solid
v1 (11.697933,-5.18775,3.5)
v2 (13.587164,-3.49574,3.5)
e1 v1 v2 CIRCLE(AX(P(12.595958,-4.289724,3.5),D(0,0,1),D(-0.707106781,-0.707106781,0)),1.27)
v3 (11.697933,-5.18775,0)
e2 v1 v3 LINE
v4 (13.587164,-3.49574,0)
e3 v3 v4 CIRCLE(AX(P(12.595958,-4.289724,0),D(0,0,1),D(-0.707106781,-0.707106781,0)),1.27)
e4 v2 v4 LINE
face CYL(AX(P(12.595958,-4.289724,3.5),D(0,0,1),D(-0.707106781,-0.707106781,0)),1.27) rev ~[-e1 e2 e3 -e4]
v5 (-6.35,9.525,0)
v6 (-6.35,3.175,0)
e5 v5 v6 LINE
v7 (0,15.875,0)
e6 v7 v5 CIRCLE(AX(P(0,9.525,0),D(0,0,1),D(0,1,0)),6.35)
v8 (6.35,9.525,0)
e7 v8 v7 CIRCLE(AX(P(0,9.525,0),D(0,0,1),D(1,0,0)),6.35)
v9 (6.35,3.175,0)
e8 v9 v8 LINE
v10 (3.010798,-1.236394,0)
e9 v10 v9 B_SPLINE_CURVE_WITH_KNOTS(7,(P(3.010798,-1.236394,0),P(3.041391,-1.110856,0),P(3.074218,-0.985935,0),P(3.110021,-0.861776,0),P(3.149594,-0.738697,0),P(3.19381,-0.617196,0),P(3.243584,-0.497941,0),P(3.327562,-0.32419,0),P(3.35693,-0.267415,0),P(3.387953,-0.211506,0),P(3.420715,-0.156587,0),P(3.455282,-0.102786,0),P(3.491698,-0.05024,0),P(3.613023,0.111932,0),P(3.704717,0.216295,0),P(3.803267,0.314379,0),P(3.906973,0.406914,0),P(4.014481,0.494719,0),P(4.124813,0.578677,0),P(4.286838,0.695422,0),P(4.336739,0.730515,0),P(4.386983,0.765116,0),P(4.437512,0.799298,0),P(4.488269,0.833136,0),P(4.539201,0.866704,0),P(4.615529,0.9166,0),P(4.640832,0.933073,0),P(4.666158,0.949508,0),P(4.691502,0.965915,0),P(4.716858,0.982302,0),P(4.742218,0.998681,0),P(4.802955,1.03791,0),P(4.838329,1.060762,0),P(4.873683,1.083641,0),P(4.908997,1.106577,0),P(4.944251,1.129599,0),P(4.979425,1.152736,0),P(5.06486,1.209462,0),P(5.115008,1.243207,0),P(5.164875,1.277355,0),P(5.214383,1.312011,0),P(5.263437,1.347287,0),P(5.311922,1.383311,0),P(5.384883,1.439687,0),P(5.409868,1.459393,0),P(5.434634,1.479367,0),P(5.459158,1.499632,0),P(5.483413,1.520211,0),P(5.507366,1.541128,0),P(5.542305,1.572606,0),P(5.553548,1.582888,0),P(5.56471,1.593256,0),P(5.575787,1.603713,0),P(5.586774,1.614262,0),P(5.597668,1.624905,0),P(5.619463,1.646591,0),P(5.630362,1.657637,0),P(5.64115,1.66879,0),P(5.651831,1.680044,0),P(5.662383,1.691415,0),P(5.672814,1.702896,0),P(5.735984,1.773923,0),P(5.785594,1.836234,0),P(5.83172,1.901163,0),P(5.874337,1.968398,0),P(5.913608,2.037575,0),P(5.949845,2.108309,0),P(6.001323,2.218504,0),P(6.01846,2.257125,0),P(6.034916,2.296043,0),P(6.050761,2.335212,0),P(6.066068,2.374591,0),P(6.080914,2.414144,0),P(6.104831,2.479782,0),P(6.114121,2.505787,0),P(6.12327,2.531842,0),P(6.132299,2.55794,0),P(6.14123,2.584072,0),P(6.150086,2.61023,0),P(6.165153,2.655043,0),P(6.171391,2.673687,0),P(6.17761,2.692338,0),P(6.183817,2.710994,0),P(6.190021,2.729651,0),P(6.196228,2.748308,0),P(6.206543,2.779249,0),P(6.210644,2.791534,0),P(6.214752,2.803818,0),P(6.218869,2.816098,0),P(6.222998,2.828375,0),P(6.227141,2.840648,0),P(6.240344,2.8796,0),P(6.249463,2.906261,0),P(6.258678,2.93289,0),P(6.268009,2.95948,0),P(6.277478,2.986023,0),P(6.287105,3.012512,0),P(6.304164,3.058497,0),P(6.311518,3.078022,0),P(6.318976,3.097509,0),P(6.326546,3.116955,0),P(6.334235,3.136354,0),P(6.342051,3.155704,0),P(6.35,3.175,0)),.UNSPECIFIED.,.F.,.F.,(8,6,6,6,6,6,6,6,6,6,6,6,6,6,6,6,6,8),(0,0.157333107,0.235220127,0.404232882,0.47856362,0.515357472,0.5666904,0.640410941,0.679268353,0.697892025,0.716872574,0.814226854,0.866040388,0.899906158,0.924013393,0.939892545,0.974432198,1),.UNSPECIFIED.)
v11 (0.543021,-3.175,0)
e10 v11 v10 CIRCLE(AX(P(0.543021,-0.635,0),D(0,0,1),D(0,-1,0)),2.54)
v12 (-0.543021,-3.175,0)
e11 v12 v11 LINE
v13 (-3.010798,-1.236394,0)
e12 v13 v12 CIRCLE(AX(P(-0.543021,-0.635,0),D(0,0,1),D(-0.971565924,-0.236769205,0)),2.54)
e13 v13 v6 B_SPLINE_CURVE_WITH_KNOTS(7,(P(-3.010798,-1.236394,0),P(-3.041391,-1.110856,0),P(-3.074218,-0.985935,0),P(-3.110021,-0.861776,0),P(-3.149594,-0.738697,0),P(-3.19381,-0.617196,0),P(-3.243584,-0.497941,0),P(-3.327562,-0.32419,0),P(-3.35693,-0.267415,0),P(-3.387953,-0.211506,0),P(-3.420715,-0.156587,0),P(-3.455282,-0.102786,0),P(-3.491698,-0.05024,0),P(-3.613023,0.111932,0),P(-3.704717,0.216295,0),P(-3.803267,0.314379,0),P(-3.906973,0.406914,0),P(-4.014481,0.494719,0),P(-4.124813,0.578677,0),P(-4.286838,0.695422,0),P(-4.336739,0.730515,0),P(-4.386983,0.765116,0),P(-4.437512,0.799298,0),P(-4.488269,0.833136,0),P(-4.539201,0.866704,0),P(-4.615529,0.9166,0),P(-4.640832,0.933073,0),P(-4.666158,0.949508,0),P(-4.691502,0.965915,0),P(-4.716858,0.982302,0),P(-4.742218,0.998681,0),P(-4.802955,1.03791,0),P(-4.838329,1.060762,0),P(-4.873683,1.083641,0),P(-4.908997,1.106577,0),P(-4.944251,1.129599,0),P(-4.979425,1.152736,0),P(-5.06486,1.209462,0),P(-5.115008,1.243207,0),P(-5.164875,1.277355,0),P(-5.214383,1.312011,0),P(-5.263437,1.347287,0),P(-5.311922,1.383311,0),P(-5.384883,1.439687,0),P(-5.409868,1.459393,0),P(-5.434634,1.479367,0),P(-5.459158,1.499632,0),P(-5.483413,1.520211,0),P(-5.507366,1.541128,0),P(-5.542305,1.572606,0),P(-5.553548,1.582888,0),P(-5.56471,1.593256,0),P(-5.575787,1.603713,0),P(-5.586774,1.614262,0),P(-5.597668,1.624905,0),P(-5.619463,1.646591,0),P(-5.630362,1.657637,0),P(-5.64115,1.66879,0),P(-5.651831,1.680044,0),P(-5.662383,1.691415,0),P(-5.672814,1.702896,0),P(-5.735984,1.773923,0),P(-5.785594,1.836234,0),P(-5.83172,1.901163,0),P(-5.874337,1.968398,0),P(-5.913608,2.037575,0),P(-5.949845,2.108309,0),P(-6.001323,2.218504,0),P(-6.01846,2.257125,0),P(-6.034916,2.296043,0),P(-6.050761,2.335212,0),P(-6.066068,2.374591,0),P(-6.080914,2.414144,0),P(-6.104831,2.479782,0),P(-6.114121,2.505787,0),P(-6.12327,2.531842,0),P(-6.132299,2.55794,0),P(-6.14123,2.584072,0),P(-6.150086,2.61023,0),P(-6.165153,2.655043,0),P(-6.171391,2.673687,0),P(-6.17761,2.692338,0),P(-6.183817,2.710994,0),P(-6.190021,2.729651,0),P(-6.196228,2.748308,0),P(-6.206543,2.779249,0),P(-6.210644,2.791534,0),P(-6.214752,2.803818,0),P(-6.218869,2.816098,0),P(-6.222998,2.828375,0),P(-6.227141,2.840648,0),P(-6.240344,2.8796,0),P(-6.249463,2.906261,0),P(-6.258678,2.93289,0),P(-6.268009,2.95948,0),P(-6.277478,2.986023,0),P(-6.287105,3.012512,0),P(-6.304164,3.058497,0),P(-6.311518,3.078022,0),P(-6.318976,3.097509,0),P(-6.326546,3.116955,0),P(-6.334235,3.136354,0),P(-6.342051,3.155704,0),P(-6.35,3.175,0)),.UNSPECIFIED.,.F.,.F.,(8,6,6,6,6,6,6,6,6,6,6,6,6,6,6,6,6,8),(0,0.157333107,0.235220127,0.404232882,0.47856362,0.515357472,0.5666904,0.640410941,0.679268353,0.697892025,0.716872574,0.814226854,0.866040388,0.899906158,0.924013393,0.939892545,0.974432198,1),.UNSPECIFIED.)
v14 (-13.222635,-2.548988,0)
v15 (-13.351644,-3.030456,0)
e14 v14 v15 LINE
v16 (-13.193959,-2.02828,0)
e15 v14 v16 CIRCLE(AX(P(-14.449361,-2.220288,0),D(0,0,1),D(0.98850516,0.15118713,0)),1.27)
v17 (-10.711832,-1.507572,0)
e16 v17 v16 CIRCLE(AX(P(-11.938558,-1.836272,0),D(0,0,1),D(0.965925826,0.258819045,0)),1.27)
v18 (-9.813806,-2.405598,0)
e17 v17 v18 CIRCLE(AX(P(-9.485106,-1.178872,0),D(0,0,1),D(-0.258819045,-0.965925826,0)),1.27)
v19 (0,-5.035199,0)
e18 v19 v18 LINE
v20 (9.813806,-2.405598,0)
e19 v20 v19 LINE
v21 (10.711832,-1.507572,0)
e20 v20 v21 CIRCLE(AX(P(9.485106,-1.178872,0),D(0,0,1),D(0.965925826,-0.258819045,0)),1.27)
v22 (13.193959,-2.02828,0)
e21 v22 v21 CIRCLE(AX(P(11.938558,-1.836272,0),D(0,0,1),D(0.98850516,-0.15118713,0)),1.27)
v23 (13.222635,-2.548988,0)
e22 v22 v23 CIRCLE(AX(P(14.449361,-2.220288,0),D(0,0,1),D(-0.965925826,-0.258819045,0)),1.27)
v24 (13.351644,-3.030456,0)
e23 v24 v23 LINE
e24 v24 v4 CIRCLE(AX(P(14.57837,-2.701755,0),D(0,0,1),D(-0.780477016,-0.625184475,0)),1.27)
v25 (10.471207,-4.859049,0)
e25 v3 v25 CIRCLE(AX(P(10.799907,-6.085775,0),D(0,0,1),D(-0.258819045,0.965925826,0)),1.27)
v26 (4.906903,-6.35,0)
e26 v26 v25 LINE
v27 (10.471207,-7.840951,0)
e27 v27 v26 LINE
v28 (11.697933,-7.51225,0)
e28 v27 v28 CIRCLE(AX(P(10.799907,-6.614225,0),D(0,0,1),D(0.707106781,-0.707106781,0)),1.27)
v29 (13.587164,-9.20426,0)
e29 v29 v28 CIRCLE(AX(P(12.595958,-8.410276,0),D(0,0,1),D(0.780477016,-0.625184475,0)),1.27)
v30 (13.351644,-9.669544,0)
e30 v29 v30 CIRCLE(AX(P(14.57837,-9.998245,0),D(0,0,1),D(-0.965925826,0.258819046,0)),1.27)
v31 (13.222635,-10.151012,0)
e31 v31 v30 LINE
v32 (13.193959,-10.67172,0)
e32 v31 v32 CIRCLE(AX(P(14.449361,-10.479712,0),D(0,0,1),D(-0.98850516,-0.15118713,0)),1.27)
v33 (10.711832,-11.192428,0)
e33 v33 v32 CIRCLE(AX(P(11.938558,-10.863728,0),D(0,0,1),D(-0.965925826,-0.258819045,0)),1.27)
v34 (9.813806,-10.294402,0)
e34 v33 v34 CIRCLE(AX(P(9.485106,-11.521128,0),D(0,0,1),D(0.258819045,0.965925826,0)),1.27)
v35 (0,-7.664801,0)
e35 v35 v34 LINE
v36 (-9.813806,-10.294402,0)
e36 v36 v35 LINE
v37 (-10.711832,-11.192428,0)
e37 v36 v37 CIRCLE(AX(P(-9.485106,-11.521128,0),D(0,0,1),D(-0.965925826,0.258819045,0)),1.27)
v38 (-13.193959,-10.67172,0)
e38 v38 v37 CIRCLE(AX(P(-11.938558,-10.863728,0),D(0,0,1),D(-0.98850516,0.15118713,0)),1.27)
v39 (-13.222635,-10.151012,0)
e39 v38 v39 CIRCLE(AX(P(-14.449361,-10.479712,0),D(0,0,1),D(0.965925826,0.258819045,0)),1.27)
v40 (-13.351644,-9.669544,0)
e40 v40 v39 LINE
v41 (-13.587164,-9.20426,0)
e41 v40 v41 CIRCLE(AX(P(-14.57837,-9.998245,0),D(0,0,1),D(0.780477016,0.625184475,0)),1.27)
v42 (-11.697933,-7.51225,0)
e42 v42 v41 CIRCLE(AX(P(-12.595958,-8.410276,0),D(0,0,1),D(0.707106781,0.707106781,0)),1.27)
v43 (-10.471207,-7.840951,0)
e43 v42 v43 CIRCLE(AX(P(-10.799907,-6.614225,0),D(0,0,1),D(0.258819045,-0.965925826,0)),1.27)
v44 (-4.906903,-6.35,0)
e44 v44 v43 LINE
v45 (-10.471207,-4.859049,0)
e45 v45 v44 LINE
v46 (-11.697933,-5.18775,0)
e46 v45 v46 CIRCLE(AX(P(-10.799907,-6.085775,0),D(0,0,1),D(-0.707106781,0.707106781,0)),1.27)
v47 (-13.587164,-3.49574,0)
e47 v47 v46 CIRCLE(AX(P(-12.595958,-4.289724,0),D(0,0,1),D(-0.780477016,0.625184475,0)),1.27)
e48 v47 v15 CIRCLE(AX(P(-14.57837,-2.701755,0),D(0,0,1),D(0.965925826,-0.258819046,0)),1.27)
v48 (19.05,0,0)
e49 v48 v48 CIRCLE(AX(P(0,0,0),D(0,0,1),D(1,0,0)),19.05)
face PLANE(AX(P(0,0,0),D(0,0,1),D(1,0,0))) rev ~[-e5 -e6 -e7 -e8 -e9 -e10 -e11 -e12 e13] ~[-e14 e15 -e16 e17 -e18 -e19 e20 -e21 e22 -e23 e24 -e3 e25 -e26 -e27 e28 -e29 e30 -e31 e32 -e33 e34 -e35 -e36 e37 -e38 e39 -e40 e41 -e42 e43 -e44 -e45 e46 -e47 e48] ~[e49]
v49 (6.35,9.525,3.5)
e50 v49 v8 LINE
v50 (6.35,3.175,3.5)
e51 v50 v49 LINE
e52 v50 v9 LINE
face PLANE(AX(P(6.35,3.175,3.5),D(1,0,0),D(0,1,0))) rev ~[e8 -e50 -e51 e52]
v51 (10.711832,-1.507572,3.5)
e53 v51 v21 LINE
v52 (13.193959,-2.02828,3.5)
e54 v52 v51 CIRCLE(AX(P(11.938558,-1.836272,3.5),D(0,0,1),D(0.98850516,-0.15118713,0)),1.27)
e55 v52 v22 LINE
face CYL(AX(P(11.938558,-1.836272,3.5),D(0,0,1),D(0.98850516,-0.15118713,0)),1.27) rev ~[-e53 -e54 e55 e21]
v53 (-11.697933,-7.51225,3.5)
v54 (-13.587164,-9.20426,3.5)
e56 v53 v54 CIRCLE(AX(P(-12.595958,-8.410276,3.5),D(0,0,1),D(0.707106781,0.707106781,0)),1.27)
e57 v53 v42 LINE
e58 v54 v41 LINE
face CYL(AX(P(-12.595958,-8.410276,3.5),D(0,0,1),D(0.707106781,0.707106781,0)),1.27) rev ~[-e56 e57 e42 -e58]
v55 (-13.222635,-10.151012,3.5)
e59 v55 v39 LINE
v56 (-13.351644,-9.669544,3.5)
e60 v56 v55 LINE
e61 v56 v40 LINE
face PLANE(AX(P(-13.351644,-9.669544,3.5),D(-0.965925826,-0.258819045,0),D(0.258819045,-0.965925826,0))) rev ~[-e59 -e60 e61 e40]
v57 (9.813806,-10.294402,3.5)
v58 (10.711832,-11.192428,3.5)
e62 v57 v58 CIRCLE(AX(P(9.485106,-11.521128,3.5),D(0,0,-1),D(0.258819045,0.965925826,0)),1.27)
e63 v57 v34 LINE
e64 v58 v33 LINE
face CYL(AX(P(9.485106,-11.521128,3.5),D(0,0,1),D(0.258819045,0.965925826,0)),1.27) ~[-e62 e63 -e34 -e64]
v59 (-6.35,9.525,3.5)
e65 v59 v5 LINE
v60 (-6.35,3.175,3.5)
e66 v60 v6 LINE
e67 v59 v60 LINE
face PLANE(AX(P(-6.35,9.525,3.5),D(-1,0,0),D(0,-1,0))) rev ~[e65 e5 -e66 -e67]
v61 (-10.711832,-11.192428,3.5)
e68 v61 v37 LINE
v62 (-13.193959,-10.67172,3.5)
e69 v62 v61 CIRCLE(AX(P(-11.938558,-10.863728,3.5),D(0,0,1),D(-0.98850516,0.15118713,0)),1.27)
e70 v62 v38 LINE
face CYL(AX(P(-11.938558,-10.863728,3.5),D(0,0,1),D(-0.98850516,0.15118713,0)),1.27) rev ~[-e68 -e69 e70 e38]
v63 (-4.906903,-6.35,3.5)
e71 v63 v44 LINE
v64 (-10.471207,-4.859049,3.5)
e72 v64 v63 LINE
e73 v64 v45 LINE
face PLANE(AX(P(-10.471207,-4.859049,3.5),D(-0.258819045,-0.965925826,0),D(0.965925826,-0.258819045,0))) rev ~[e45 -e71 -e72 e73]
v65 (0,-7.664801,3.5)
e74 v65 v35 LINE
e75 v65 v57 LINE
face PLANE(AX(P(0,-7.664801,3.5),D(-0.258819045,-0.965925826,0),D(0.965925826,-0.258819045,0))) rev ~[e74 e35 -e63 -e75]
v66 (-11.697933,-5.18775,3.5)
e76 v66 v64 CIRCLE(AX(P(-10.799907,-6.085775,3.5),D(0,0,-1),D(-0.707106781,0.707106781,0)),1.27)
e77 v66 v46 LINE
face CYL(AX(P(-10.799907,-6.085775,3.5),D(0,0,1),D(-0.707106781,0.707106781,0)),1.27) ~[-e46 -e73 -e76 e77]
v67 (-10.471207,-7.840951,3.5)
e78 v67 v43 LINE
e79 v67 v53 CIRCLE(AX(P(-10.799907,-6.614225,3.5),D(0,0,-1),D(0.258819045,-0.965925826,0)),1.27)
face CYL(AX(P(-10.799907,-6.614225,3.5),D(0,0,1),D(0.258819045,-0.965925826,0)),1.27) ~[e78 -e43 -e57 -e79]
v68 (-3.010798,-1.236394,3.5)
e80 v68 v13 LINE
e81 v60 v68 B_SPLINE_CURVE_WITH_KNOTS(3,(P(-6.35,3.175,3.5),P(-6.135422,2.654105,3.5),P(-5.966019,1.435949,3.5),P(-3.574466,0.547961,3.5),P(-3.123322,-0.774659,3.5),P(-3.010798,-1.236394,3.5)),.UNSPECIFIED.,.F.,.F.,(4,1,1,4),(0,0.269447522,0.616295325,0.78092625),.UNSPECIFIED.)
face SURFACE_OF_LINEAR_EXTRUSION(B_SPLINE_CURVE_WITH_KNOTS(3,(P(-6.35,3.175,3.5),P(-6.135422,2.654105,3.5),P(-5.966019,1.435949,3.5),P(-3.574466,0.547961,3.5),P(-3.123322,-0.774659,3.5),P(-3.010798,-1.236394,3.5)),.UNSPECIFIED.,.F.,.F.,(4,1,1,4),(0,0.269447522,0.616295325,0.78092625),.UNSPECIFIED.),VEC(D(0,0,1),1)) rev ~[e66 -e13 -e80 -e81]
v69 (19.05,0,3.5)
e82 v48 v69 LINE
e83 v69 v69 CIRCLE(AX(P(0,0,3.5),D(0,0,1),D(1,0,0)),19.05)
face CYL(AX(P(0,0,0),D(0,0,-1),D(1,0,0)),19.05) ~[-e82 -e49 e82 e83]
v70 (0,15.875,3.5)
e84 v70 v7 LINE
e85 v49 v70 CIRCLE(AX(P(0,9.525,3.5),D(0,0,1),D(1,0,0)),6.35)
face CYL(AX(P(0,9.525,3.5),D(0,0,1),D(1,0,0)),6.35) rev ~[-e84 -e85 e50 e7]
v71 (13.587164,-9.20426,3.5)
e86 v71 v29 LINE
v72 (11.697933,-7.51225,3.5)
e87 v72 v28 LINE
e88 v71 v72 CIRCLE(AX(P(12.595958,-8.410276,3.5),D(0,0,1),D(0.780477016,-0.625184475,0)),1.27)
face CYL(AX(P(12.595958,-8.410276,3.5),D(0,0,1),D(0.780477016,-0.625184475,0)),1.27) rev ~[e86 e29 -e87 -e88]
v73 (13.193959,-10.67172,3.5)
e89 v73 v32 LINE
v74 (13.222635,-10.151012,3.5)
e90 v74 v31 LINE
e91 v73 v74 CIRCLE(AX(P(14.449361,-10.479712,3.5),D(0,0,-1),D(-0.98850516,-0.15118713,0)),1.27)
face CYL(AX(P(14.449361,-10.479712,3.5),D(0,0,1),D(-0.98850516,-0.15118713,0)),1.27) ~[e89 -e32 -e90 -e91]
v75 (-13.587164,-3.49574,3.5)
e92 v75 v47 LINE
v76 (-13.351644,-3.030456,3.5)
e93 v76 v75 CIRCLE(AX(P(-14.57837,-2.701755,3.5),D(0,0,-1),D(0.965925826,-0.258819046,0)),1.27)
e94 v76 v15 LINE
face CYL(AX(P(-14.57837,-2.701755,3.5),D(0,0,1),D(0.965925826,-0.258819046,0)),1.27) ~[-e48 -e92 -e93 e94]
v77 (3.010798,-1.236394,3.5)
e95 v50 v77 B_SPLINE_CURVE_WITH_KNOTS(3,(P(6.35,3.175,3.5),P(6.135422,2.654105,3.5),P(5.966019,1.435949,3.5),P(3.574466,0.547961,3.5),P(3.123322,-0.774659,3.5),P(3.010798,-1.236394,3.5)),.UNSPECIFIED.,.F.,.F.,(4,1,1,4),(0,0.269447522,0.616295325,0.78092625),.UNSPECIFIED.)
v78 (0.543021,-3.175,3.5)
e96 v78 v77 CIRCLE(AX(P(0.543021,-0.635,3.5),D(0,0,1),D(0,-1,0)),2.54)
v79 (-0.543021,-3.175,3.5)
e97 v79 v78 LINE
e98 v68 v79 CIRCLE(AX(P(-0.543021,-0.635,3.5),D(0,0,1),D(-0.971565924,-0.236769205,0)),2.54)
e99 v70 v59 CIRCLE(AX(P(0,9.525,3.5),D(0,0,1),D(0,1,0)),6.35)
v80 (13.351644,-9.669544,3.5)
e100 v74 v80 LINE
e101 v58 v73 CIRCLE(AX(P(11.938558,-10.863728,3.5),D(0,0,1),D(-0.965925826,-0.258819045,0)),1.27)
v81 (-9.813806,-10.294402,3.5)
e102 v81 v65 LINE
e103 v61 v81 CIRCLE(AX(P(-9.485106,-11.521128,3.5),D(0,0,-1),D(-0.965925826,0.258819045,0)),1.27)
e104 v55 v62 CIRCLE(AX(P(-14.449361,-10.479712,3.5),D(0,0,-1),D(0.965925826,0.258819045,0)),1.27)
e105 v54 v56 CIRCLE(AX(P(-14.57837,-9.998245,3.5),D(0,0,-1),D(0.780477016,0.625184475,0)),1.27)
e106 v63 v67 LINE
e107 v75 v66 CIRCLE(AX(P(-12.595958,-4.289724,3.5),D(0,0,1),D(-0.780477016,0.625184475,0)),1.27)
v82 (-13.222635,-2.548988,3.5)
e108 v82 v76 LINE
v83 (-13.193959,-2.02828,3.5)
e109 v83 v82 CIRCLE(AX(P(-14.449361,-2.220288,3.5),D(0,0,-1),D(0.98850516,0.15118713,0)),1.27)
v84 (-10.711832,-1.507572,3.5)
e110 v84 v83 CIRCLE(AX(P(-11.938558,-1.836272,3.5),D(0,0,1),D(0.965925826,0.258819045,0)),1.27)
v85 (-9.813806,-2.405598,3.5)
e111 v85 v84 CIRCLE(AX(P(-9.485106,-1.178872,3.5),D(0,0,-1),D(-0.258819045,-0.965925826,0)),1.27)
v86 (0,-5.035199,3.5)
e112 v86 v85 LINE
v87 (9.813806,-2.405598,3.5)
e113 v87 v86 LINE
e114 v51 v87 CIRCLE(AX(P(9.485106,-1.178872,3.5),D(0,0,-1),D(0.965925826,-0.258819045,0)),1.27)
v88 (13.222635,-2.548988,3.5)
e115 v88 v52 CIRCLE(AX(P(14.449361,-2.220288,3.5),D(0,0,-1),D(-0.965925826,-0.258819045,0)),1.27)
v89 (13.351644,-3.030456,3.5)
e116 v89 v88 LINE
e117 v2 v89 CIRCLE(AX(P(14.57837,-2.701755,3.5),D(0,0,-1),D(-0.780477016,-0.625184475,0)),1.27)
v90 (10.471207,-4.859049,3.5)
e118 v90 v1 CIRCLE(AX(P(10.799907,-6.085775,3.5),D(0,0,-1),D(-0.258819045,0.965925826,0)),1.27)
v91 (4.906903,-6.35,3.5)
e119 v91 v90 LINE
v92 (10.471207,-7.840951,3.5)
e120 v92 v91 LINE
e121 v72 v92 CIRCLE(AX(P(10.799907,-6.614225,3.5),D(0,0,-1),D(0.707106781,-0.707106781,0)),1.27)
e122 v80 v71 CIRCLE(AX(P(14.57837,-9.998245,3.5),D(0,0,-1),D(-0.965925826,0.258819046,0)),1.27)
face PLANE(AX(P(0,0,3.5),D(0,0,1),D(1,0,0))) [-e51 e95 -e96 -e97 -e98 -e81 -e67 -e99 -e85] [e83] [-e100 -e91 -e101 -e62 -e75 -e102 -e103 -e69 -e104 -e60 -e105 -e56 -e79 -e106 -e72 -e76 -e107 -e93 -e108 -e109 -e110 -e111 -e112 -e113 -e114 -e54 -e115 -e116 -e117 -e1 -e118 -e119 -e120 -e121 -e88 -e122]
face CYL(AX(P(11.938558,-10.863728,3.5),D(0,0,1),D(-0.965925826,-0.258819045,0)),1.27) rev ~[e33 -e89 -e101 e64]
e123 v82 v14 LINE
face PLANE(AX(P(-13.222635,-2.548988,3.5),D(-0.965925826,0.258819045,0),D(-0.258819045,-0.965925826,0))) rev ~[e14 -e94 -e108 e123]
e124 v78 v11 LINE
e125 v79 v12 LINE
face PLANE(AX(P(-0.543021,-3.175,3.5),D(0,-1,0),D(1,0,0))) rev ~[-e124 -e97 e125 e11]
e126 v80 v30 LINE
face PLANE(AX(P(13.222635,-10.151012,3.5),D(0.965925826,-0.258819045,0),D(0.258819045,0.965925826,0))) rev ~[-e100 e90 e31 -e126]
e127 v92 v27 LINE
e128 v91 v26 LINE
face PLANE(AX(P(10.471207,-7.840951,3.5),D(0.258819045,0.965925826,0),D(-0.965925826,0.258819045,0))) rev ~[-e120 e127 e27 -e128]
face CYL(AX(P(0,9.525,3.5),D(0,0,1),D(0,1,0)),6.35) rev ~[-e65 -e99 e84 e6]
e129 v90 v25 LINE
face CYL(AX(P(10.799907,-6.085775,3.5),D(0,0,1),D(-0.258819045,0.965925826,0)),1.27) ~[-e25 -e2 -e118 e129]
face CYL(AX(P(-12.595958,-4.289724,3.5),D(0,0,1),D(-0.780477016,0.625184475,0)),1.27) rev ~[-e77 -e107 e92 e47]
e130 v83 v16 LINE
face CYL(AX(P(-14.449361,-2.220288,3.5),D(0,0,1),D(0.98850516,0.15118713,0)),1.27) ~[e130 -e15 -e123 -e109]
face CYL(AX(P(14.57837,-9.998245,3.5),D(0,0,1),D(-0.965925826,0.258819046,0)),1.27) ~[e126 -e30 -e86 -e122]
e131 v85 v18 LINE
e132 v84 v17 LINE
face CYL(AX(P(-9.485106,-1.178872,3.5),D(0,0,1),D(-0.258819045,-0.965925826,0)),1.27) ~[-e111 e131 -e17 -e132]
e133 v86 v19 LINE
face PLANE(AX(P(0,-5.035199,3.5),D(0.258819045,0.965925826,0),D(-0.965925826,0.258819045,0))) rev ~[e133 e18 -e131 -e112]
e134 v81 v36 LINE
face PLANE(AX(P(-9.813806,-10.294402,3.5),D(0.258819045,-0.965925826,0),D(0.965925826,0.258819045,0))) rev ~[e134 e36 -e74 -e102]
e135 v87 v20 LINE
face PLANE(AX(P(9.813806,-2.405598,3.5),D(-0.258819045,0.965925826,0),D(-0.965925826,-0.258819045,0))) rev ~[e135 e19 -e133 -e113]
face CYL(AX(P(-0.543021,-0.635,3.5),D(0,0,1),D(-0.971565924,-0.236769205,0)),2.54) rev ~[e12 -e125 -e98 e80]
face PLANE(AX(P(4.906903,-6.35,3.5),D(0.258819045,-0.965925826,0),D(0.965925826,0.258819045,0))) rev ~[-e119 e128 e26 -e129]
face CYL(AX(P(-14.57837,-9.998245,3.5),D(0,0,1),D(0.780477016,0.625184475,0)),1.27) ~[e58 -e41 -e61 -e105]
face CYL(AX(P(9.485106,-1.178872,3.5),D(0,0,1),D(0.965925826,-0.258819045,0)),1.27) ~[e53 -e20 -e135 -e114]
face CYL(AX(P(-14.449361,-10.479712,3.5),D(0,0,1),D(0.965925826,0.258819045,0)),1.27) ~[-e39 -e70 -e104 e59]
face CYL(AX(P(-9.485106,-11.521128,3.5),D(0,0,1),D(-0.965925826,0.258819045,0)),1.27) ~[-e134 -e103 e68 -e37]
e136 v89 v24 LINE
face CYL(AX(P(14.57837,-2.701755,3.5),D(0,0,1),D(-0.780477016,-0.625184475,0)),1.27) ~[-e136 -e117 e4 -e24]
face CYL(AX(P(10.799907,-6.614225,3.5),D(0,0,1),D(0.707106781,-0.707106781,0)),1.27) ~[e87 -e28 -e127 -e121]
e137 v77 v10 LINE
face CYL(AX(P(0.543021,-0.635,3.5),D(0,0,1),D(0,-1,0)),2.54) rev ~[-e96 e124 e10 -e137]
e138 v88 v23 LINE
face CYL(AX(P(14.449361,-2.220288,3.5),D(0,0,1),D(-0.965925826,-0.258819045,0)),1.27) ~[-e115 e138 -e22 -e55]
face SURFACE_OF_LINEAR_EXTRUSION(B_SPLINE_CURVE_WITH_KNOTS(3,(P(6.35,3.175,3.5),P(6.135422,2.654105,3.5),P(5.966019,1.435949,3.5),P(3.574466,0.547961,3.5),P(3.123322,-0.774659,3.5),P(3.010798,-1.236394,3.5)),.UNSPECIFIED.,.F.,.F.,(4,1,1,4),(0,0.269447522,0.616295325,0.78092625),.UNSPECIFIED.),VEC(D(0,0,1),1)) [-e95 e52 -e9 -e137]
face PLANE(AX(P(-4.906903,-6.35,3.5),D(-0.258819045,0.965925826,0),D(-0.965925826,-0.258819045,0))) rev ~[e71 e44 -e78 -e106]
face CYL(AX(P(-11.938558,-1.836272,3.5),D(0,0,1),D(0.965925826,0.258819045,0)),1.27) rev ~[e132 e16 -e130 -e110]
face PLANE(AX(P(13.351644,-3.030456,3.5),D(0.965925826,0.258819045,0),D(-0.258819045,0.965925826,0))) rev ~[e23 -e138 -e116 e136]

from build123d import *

# Parameters (mm, degrees)
F0_R     = 19.05
F1_DEPTH = 3.5
F3_DEPTH = 5.334
F5_DEPTH = 25.4


# Not quite as in the source:
# - a feature names something its author has since deleted; it is built from what else it names


with BuildPart() as f1:
    # F0 (on Top) → F1 (new body)
    with BuildSketch(Plane.XY):
        Circle(F0_R)
    extrude(amount=F1_DEPTH)

    # F2 (on face) → F3 (cut)
    with BuildSketch(Plane.XY.offset(3.5)):
        with BuildLine():
            Line((0, -3.175), (0.5430206191, -3.175))
            ThreePointArc((0.5430206191, -3.175), (2.1121063082, -2.6323908231), (3.0107980648, -1.2363937796))
            add(Edge.make_bspline(
                [(6.35, 3.175), (6.1354222845, 2.6541048515), (5.9660194487, 1.4359488031), (3.5744657813, 0.5479613391), (3.1233221277, -0.7746591325), (3.0107980648, -1.2363937796)],
                knots=[0, 0, 0, 0, 0.2694475223, 0.6162953248, 0.7809262502, 0.7809262502, 0.7809262502, 0.7809262502], degree=3))
            Line((6.35, 3.175), (6.35, 9.525))
            ThreePointArc((6.35, 9.525), (4.4901280605, 14.0151280605), (0, 15.875))
            Line((0, 15.875), (0, -3.175))
        make_face()
        with BuildLine():
            Line((-0.5430206191, -3.175), (0, -3.175))
            Line((0, -3.175), (0, 15.875))
            ThreePointArc((0, 15.875), (-4.4901280605, 14.0151280605), (-6.35, 9.525))
            Line((-6.35, 9.525), (-6.35, 3.175))
            add(Edge.make_bspline(
                [(-6.35, 3.175), (-6.1354222845, 2.6541048515), (-5.9660194487, 1.4359488031), (-3.5744657813, 0.5479613391), (-3.1233221277, -0.7746591325), (-3.0107980648, -1.2363937796)],
                knots=[0, 0, 0, 0, 0.2694475223, 0.6162953248, 0.7809262502, 0.7809262502, 0.7809262502, 0.7809262502], degree=3))
            ThreePointArc((-3.0107980648, -1.2363937796), (-2.1121063082, -2.6323908231), (-0.5430206191, -3.175))
        make_face()
    extrude(amount=-F3_DEPTH, mode=Mode.SUBTRACT)

    # F4 (on face) → F5 (cut)
    with BuildSketch(Plane.XY.offset(3.5)):
        with BuildLine():
            Line((-12.2672579939, -3.0629981272), (-11.9385578066, -1.8362723278))
            Line((-11.9385578066, -1.8362723278), (-9.8138063951, -2.4055977526))
            ThreePointArc((-9.8138063951, -2.4055977526), (-10.3831318199, -2.0768975654), (-10.7118320072, -1.5075721405))
            ThreePointArc((-10.7118320072, -1.5075721405), (-12.1993062273, -0.5933281371), (-13.1939593601, -2.0282799825))
            ThreePointArc((-13.1939593601, -2.0282799825), (-13.1812823619, -2.2901216321), (-13.2226351142, -2.5489878245))
            Line((-13.2226351142, -2.5489878245), (-13.3516440016, -3.030455547))
            ThreePointArc((-13.3516440016, -3.030455547), (-13.4452645639, -3.2753166219), (-13.5871639911, -3.4957396431))
            ThreePointArc((-13.5871639911, -3.4957396431), (-13.4432450328, -5.2357709608), (-11.697932569, -5.1877495387))
            ThreePointArc((-11.697932569, -5.1877495387), (-11.1286071442, -4.8590493514), (-10.4712067697, -4.8590493514))
            Line((-10.4712067697, -4.8590493514), (-12.5959581812, -4.2897239266))
            Line((-12.5959581812, -4.2897239266), (-12.2672579939, -3.0629981272))
        make_face()
        Polygon((-9.8138063951, -2.4055977526), (-11.9385578066, -1.8362723278), (-12.2672579939, -3.0629981272), (-2.4534515988, -5.6925996254), (0, -5.0351992509), align=None)
        Polygon((-2.4534515988, -5.6925996254), (-12.2672579939, -3.0629981272), (-12.5959581812, -4.2897239266), (-10.4712067697, -4.8590493514), (-4.9069031975, -6.35), align=None)
        with BuildLine():
            Line((9.8138063951, -2.4055977526), (0, -5.0351992509))
            Line((0, -5.0351992509), (2.4534515988, -5.6925996254))
            Line((2.4534515988, -5.6925996254), (4.9069031975, -6.35))
            Line((4.9069031975, -6.35), (10.4712067697, -4.8590493514))
            ThreePointArc((10.4712067697, -4.8590493514), (11.1286071442, -4.8590493514), (11.697932569, -5.1877495387))
            ThreePointArc((11.697932569, -5.1877495387), (13.4432450328, -5.2357709608), (13.5871639911, -3.4957396431))
            ThreePointArc((13.5871639911, -3.4957396431), (13.4452645639, -3.2753166219), (13.3516440016, -3.030455547))
            Line((13.3516440016, -3.030455547), (13.2226351142, -2.5489878245))
            ThreePointArc((13.2226351142, -2.5489878245), (13.1812823619, -2.2901216321), (13.1939593601, -2.0282799825))
            ThreePointArc((13.1939593601, -2.0282799825), (12.1993062273, -0.5933281371), (10.7118320072, -1.5075721405))
            ThreePointArc((10.7118320072, -1.5075721405), (10.3831318199, -2.0768975654), (9.8138063951, -2.4055977526))
        make_face()
        Polygon((0, -6.35), (0, -5.0351992509), (-2.4534515988, -5.6925996254), align=None)
        Polygon((2.4534515988, -5.6925996254), (0, -5.0351992509), (0, -6.35), align=None)
        Polygon((0, -6.35), (-2.4534515988, -5.6925996254), (-4.9069031975, -6.35), (-2.4534515988, -7.0074003746), align=None)
        Polygon((4.9069031975, -6.35), (2.4534515988, -5.6925996254), (0, -6.35), align=None)
        Polygon((4.9069031975, -6.35), (0, -6.35), (2.4534515988, -7.0074003746), align=None)
        Polygon((2.4534515988, -7.0074003746), (0, -6.35), (-2.4534515988, -7.0074003746), (0, -7.6648007491), align=None)
        Polygon((-2.4534515988, -7.0074003746), (-4.9069031975, -6.35), (-10.4712067697, -7.8409506486), (-12.5959581812, -8.4102760734), (-12.2672579939, -9.6370018728), align=None)
        Polygon((10.4712067697, -7.8409506486), (4.9069031975, -6.35), (2.4534515988, -7.0074003746), (12.2672579939, -9.6370018728), (12.5959581812, -8.4102760734), align=None)
        Polygon((12.2672579939, -9.6370018728), (2.4534515988, -7.0074003746), (0, -7.6648007491), (9.8138063951, -10.2944022474), (11.9385578066, -10.8637276722), align=None)
        Polygon((0, -7.6648007491), (-2.4534515988, -7.0074003746), (-12.2672579939, -9.6370018728), (-11.9385578066, -10.8637276722), (-9.8138063951, -10.2944022474), align=None)
        with BuildLine():
            Line((-12.5959581812, -8.4102760734), (-10.4712067697, -7.8409506486))
            ThreePointArc((-10.4712067697, -7.8409506486), (-11.1286071442, -7.8409506486), (-11.697932569, -7.5122504613))
            ThreePointArc((-11.697932569, -7.5122504613), (-13.4432450328, -7.4642290392), (-13.5871639911, -9.2042603569))
            ThreePointArc((-13.5871639911, -9.2042603569), (-13.4452645639, -9.4246833781), (-13.3516440016, -9.669544453))
            Line((-13.3516440016, -9.669544453), (-13.2226351142, -10.1510121755))
            ThreePointArc((-13.2226351142, -10.1510121755), (-13.1812823619, -10.4098783679), (-13.1939593601, -10.6717200175))
            ThreePointArc((-13.1939593601, -10.6717200175), (-12.1993062273, -12.1066718629), (-10.7118320072, -11.1924278595))
            ThreePointArc((-10.7118320072, -11.1924278595), (-10.3831318199, -10.6231024346), (-9.8138063951, -10.2944022474))
            Line((-9.8138063951, -10.2944022474), (-11.9385578066, -10.8637276722))
            Line((-11.9385578066, -10.8637276722), (-12.2672579939, -9.6370018728))
            Line((-12.2672579939, -9.6370018728), (-12.5959581812, -8.4102760734))
        make_face()
        with BuildLine():
            ThreePointArc((11.697932569, -7.5122504613), (11.1286071442, -7.8409506486), (10.4712067697, -7.8409506486))
            Line((10.4712067697, -7.8409506486), (12.5959581812, -8.4102760734))
            Line((12.5959581812, -8.4102760734), (12.2672579939, -9.6370018728))
            Line((12.2672579939, -9.6370018728), (11.9385578066, -10.8637276722))
            Line((11.9385578066, -10.8637276722), (9.8138063951, -10.2944022474))
            ThreePointArc((9.8138063951, -10.2944022474), (10.3831318199, -10.6231024346), (10.7118320072, -11.1924278595))
            ThreePointArc((10.7118320072, -11.1924278595), (12.1993062273, -12.1066718629), (13.1939593601, -10.6717200175))
            ThreePointArc((13.1939593601, -10.6717200175), (13.1812823619, -10.4098783679), (13.2226351142, -10.1510121755))
            Line((13.2226351142, -10.1510121755), (13.3516440016, -9.669544453))
            ThreePointArc((13.3516440016, -9.669544453), (13.4452645639, -9.4246833781), (13.5871639911, -9.2042603569))
            ThreePointArc((13.5871639911, -9.2042603569), (13.4432450328, -7.4642290392), (11.697932569, -7.5122504613))
        make_face()
    extrude(amount=-F5_DEPTH, mode=Mode.SUBTRACT)


solid = f1.part
